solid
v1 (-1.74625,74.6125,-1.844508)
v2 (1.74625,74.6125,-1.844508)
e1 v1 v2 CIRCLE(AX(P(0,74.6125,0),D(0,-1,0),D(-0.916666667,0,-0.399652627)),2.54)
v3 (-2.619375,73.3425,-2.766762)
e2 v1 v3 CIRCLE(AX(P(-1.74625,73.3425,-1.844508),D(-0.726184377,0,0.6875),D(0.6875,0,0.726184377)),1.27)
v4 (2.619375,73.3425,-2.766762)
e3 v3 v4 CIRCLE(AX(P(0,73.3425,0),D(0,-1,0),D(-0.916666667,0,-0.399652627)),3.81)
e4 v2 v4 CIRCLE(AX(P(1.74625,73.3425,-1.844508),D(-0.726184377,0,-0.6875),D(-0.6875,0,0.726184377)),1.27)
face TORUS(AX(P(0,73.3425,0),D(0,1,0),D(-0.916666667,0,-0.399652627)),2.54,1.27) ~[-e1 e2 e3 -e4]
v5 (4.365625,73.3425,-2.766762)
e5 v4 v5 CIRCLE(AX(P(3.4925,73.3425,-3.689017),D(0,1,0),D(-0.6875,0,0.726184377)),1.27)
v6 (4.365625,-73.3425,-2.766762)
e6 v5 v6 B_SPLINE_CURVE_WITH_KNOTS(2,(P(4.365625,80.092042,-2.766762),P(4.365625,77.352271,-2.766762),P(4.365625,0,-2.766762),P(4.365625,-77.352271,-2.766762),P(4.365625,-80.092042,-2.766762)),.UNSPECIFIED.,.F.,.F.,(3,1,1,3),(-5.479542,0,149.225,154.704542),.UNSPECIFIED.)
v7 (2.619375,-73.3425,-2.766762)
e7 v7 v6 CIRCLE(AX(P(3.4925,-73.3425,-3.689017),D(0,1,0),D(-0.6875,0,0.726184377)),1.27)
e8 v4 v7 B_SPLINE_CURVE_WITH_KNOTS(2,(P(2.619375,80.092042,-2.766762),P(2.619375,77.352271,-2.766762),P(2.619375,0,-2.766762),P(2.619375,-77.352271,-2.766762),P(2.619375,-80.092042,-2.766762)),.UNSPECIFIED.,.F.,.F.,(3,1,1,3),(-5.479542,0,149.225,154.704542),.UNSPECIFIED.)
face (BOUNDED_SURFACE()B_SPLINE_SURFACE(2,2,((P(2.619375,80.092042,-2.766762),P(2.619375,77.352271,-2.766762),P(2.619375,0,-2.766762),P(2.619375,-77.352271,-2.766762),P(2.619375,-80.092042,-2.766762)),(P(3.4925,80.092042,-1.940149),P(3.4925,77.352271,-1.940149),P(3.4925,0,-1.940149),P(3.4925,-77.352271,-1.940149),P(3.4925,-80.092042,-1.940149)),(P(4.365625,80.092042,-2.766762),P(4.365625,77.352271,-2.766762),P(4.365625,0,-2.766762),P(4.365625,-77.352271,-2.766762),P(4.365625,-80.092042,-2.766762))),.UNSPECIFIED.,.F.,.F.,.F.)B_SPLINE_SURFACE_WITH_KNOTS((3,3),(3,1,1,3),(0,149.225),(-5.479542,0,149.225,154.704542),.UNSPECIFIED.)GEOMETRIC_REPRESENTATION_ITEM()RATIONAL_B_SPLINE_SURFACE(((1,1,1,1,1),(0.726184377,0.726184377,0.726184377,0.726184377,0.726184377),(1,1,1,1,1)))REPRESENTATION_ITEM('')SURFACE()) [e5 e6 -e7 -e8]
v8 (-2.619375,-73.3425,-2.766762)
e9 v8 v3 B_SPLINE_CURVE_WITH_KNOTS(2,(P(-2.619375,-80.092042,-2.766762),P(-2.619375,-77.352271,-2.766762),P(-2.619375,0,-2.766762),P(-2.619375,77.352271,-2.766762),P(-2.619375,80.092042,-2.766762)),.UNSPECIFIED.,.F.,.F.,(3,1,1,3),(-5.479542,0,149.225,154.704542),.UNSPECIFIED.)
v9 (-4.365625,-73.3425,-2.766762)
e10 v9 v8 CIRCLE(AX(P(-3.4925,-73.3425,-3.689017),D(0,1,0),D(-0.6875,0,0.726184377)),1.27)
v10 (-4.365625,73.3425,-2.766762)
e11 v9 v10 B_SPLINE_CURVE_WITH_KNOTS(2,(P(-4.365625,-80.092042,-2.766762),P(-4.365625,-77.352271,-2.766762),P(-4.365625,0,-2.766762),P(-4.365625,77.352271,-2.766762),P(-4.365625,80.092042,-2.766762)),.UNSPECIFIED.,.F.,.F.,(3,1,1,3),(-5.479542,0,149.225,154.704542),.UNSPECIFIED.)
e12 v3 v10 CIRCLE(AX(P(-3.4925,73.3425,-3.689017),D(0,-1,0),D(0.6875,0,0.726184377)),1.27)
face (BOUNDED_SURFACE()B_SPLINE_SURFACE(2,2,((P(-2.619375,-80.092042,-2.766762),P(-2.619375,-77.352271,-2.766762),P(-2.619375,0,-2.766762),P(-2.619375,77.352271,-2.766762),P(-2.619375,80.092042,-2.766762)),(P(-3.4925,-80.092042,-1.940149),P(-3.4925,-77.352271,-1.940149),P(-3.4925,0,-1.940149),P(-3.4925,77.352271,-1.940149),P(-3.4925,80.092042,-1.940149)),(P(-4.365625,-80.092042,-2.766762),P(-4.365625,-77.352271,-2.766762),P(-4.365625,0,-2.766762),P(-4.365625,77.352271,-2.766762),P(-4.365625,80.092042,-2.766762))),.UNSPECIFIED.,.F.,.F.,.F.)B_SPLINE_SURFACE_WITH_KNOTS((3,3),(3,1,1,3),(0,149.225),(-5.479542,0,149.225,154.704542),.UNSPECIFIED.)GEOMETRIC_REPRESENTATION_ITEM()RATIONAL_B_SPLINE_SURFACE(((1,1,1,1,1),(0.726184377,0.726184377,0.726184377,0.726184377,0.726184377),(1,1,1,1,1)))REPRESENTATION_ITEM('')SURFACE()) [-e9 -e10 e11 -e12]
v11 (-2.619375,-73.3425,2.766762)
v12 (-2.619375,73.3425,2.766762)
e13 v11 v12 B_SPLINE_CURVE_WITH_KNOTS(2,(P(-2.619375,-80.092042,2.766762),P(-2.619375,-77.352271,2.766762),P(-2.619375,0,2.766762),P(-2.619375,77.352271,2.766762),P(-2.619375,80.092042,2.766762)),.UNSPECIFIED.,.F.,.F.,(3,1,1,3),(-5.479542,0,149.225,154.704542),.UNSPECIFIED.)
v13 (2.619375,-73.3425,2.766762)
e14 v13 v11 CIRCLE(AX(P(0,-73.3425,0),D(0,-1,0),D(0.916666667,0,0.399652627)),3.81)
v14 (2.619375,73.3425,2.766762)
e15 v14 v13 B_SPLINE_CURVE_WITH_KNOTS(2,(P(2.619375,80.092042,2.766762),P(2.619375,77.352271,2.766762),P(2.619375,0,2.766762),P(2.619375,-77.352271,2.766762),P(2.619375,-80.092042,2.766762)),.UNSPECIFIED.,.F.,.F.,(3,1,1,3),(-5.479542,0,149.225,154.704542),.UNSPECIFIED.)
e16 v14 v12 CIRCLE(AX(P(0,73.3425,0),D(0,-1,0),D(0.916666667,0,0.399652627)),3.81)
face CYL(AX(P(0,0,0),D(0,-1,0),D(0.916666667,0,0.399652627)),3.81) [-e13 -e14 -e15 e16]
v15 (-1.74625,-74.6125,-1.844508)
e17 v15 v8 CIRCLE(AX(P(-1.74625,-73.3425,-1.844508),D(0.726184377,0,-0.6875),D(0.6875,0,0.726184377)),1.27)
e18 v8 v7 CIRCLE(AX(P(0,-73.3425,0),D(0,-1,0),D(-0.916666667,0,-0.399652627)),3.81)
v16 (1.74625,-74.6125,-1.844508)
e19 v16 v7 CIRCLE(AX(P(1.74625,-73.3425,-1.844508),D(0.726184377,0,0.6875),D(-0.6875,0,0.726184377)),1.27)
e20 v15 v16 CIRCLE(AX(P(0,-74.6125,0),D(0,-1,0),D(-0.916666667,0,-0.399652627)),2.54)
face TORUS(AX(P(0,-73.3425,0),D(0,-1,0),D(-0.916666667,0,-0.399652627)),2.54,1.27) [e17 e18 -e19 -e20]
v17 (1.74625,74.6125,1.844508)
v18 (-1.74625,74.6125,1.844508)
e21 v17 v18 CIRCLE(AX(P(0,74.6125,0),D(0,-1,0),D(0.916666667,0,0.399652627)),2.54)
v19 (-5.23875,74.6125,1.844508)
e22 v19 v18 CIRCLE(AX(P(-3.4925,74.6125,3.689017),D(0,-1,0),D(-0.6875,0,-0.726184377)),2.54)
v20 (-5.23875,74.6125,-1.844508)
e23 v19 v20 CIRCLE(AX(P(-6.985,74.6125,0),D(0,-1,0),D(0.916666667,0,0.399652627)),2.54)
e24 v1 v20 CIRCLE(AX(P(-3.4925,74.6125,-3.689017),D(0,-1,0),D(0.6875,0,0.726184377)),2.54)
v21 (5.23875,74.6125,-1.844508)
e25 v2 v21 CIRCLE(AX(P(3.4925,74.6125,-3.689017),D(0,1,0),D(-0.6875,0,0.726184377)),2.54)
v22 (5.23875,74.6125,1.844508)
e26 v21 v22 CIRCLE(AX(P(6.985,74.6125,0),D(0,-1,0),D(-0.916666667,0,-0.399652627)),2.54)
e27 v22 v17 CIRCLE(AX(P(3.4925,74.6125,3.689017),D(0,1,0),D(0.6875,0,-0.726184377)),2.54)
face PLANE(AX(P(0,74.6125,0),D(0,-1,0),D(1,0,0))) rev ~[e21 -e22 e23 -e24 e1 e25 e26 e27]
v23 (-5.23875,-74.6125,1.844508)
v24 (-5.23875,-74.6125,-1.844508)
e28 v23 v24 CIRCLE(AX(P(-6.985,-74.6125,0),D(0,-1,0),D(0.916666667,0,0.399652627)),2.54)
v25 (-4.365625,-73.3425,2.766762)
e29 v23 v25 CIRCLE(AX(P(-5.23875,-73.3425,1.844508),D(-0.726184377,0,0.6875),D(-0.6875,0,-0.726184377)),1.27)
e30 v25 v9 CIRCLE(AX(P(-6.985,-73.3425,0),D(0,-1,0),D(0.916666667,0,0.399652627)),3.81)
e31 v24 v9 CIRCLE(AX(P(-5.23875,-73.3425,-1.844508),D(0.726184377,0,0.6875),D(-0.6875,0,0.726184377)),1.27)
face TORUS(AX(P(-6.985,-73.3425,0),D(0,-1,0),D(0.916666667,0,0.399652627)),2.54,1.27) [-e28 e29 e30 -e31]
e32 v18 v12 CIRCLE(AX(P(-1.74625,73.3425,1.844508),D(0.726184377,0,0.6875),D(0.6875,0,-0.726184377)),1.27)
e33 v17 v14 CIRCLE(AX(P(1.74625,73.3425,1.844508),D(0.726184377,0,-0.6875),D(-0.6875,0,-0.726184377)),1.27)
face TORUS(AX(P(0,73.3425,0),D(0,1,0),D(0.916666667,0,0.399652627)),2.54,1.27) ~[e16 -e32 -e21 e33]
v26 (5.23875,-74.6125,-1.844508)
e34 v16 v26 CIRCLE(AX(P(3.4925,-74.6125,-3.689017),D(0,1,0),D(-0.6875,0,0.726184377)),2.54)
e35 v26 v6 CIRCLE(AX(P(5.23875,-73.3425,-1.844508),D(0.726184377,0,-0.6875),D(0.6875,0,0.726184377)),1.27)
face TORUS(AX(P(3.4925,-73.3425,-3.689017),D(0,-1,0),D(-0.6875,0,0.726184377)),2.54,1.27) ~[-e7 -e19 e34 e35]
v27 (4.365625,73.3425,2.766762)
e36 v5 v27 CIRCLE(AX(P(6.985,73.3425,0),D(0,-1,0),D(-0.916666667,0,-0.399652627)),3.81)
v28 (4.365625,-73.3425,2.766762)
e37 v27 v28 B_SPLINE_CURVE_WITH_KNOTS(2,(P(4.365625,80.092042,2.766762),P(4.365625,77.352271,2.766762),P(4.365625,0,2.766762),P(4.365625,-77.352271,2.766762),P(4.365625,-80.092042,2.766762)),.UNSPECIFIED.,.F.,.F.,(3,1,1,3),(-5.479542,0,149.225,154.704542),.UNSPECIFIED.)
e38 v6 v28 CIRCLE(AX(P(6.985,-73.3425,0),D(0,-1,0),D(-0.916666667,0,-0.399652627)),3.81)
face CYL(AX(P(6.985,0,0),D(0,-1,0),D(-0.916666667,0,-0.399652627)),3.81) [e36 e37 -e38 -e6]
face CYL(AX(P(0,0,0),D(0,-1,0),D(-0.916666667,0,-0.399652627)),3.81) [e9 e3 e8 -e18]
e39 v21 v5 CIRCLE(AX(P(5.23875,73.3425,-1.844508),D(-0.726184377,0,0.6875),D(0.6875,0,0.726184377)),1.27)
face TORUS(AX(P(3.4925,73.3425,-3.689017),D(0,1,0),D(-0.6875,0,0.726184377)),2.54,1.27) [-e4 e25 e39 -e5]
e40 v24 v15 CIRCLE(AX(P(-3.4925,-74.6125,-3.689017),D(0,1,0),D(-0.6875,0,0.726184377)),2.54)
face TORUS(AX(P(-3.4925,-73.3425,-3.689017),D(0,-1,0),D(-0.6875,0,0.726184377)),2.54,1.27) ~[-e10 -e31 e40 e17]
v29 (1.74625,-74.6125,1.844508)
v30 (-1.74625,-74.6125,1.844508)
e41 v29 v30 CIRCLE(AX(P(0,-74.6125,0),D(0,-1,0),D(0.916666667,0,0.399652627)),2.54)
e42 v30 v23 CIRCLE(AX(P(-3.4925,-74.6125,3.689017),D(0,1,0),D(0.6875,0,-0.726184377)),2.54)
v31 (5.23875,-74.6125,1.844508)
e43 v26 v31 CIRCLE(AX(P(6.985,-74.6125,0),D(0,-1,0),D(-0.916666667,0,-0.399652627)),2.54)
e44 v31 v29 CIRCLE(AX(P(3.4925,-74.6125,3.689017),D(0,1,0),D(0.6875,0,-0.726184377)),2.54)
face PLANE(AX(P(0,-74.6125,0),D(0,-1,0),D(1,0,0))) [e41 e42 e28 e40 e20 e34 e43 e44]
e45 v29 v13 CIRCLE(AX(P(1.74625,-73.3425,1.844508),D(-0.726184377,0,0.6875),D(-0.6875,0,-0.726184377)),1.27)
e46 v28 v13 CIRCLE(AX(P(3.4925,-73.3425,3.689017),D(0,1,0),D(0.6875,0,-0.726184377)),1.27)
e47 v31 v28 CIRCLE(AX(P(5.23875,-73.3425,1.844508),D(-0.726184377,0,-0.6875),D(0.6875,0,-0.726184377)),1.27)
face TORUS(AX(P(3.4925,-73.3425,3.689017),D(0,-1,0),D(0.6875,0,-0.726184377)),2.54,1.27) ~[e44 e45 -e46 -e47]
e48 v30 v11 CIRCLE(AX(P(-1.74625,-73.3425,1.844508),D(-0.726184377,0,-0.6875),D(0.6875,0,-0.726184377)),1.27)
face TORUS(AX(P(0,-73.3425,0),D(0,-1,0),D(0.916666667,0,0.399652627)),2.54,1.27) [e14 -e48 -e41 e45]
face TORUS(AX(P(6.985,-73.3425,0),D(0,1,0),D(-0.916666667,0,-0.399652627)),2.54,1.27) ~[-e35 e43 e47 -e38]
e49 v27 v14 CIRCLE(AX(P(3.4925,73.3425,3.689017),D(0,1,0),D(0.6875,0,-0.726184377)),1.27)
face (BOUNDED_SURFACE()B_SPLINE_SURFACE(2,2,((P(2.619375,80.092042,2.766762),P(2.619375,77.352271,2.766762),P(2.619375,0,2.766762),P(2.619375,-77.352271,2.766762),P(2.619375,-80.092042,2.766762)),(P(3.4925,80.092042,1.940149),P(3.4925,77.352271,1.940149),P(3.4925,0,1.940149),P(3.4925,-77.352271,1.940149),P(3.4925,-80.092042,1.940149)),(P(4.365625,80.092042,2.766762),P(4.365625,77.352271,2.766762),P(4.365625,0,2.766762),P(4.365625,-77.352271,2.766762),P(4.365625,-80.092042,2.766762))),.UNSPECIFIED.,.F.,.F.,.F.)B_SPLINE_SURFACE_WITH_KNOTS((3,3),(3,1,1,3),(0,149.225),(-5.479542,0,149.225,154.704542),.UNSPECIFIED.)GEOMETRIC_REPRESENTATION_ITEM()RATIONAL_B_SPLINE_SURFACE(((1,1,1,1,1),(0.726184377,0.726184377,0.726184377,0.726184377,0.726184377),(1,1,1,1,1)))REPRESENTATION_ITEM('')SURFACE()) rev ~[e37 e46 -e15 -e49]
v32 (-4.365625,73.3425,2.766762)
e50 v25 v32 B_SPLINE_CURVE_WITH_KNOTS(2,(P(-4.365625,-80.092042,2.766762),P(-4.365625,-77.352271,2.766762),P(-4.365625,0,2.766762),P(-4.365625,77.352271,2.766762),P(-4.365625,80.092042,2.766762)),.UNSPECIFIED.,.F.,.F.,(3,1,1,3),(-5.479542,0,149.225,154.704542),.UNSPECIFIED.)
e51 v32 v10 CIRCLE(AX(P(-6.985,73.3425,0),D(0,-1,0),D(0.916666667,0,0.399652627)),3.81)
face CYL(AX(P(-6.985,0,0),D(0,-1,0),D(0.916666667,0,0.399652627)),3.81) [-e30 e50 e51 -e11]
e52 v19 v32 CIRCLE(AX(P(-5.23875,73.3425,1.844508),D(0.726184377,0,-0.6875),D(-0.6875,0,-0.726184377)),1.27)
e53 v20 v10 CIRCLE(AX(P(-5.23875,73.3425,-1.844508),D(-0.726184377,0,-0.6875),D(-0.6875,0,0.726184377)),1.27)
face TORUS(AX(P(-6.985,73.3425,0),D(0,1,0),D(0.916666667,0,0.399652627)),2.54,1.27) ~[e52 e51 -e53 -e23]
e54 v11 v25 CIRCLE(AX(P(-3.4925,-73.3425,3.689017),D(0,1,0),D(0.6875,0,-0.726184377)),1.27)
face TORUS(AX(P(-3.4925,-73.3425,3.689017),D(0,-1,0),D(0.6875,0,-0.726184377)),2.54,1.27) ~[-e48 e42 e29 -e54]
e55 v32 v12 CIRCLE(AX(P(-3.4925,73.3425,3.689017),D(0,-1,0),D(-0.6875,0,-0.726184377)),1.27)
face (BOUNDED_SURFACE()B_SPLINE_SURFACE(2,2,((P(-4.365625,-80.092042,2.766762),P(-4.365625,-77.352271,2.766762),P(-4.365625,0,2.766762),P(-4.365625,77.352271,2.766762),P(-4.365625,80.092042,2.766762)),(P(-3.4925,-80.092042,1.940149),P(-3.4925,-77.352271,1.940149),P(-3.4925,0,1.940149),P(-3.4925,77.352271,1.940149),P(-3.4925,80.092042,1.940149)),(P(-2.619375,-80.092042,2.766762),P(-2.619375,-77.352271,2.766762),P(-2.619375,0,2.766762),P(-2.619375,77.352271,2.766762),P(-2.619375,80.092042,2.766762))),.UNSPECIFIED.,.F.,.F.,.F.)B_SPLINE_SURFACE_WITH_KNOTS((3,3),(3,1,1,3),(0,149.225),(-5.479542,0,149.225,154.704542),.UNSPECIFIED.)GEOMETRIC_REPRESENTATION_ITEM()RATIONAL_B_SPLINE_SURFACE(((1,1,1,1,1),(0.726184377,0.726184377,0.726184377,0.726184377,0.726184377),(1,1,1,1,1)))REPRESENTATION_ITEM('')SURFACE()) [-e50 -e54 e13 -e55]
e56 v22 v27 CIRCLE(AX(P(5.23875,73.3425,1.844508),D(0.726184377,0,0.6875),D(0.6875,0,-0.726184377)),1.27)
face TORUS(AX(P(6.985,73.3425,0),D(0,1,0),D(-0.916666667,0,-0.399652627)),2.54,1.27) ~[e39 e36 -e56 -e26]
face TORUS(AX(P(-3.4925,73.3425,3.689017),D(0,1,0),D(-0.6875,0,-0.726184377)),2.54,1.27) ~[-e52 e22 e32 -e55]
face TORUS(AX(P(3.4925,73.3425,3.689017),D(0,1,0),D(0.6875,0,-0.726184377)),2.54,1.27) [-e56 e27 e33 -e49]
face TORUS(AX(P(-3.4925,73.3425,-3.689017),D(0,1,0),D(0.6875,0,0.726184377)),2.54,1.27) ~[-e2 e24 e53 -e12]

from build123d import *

# Parameters (mm, degrees)
F1_DEPTH = 74.6125
F2_R     = 1.27


with BuildPart() as f1:
    # F0 (on Front) → F1 (new body, symmetric)
    with BuildSketch(Plane.XZ):
        with BuildLine():
            ThreePointArc((-3.4925, -1.5226765087), (0, -3.81), (3.4925, -1.5226765087))
            ThreePointArc((3.4925, -1.5226765087), (10.795, 0), (3.4925, 1.5226765087))
            ThreePointArc((3.4925, 1.5226765087), (0, 3.81), (-3.4925, 1.5226765087))
            ThreePointArc((-3.4925, 1.5226765087), (-10.795, 0), (-3.4925, -1.5226765087))
        make_face()
    extrude(amount=F1_DEPTH, both=True)

    # F2
    f2_edges = [f1.edges().sort_by_distance(p)[0] for p in [
        (0, 74.6125, 3.81),
        (-3.4925, 0, 1.522677),
        (0, -74.6125, 3.81),
        (3.4925, 0, 1.522677),
        (10.795, 74.6125, 0),
        (10.795, -74.6125, 0),
        (3.4925, 0, -1.522677),
        (-10.795, 74.6125, 0),
        (-3.4925, 0, -1.522677),
        (-10.795, -74.6125, 0),
        (0, 74.6125, -3.81),
        (0, -74.6125, -3.81),
    ]]
    fillet(f2_edges, radius=F2_R)


solid = f1.part
